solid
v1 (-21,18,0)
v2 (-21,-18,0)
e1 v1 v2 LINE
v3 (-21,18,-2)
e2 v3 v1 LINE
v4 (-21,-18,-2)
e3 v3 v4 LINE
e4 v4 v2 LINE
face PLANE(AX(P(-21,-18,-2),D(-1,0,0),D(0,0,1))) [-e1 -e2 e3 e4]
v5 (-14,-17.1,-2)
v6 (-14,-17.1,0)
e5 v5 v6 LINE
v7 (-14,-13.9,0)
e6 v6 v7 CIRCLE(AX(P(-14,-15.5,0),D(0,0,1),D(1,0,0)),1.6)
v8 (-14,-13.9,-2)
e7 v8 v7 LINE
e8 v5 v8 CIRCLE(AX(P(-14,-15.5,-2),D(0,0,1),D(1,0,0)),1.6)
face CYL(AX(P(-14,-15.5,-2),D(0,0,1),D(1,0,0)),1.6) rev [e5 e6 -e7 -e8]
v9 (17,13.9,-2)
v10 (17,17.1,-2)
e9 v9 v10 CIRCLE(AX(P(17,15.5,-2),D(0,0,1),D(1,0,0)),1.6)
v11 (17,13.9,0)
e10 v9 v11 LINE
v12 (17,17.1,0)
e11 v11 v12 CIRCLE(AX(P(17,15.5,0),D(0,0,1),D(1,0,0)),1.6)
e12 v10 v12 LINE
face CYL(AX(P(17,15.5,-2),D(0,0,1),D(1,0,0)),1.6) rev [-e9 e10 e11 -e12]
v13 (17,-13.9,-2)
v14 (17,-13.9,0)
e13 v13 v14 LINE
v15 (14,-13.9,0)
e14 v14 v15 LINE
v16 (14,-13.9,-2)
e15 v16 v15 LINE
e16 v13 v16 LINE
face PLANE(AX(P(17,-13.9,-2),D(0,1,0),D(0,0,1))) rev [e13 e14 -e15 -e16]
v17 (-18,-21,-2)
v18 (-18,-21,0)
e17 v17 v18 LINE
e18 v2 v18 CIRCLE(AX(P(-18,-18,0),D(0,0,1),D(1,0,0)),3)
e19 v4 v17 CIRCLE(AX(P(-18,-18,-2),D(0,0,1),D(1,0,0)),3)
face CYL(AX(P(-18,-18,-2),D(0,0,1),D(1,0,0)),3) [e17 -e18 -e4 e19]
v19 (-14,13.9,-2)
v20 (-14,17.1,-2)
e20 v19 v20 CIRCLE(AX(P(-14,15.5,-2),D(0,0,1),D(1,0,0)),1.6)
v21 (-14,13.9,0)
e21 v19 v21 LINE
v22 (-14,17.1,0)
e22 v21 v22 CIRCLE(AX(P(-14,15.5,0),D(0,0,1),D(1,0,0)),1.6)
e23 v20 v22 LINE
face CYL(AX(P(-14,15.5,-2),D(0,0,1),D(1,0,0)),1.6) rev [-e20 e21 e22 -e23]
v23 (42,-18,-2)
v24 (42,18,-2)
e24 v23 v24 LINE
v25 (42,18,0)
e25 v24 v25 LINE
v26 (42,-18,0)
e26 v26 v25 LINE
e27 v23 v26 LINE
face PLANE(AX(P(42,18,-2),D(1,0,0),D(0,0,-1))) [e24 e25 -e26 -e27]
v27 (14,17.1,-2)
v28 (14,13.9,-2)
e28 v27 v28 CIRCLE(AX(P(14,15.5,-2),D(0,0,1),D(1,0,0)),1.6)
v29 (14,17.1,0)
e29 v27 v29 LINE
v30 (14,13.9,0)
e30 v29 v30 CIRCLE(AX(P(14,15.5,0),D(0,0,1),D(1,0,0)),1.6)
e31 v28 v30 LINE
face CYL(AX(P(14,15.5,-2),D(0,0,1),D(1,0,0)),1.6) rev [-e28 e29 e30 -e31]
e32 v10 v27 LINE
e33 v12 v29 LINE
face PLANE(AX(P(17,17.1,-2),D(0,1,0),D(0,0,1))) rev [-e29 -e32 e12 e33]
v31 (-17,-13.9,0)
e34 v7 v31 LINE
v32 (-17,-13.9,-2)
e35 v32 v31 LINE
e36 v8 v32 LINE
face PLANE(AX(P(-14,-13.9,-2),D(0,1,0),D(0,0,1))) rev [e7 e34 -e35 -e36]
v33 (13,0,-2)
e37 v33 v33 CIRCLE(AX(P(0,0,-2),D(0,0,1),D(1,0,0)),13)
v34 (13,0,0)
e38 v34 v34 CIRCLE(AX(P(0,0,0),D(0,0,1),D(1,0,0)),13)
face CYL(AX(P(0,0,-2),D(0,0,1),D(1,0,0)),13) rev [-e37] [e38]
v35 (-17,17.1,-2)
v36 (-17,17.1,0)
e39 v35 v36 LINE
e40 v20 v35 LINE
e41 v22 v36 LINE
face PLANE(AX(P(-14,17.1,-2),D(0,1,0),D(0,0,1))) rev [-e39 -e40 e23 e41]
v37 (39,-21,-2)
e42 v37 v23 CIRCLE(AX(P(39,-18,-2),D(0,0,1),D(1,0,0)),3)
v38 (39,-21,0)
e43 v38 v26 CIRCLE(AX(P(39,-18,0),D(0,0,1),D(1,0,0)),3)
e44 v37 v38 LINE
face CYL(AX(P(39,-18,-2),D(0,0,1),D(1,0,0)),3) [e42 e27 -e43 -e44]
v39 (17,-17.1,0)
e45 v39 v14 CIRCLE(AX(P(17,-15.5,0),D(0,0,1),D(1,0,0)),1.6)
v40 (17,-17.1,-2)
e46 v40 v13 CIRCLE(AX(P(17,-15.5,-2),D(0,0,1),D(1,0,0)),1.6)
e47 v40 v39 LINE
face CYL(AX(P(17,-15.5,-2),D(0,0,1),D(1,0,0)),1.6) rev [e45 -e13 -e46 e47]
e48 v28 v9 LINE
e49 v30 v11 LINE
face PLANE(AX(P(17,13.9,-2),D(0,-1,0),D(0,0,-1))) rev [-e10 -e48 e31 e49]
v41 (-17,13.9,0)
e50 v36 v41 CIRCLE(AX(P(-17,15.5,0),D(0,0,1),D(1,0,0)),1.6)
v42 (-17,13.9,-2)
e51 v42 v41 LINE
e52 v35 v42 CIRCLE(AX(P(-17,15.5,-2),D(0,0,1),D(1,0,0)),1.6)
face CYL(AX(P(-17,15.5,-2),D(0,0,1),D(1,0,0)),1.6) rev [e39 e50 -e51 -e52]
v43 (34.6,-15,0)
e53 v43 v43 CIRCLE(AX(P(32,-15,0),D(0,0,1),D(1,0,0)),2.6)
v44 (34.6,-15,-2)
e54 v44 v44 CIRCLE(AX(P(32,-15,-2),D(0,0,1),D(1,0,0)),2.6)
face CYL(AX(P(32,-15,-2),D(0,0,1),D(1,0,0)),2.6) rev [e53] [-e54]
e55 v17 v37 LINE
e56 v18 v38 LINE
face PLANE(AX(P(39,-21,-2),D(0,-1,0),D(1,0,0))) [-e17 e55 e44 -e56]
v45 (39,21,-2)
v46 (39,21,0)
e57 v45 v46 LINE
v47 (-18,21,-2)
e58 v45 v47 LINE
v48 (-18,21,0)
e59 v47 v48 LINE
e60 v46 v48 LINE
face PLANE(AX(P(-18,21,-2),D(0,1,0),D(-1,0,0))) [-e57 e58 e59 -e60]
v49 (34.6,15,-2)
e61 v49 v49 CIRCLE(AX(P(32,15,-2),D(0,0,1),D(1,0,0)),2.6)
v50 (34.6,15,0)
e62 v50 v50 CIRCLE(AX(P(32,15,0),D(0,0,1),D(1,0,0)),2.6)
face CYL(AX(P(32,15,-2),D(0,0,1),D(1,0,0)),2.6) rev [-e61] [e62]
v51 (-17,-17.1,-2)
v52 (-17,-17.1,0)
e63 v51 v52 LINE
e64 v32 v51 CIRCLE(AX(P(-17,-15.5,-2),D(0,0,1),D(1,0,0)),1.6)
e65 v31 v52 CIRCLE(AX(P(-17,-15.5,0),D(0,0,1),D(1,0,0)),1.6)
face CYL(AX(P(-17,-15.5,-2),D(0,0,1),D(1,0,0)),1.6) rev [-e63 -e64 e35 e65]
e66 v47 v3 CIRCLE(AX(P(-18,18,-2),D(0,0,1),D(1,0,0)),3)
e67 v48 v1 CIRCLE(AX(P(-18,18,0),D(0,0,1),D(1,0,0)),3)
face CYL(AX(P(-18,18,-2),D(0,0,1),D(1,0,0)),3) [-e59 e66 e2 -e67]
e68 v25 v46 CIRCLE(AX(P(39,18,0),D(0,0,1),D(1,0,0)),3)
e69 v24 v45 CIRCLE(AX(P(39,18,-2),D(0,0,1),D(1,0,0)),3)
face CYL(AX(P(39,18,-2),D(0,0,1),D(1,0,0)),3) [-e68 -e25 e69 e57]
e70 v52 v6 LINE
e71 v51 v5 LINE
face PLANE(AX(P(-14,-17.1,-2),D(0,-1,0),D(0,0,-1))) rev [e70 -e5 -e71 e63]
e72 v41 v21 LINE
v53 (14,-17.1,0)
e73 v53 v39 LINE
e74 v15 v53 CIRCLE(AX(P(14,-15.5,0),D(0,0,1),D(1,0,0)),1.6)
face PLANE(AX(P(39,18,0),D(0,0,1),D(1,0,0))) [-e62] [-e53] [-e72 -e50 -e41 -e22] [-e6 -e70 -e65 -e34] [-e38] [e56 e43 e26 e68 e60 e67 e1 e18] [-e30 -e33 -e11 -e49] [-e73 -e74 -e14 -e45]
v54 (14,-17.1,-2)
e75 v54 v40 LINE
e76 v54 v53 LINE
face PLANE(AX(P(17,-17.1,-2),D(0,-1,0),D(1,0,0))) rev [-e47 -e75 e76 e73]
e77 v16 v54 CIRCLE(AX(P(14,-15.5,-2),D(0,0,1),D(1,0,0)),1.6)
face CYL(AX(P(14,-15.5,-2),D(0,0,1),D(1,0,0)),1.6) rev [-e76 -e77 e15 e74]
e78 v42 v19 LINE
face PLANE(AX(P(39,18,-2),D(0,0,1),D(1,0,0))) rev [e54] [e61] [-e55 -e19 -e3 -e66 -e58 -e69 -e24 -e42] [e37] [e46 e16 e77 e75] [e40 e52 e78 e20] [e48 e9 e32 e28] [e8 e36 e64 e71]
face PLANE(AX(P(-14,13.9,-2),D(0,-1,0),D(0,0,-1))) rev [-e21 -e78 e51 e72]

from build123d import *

# Parameters (mm, degrees)
SKETCH_1_R             = 13
SKETCH_1_R_2           = 2.6
SM_BASE_FLANGE_1_DEPTH = 2


# Sheet-metal steps are written as plain solids
with BuildPart() as part:
    # Sketch 1 → 基体-法兰1 (new body)
    with BuildSketch(Plane.XY):
        with BuildLine():
            Line((42, 18), (42, -18))
            ThreePointArc((42, -18), (41.121320344, -20.121320344), (39, -21))
            Line((39, -21), (-18, -21))
            ThreePointArc((-18, -21), (-20.121320344, -20.121320344), (-21, -18))
            Line((-21, -18), (-21, 18))
            ThreePointArc((-21, 18), (-20.121320344, 20.121320344), (-18, 21))
            Line((-18, 21), (39, 21))
            ThreePointArc((39, 21), (41.121320344, 20.121320344), (42, 18))
        make_face()
        Circle(SKETCH_1_R, mode=Mode.SUBTRACT)
        with Locations((32, 15)):
            Circle(SKETCH_1_R_2, mode=Mode.SUBTRACT)
        with Locations((32, -15)):
            Circle(SKETCH_1_R_2, mode=Mode.SUBTRACT)
        with BuildLine():
            Line((-14, 13.9), (-17, 13.9))
            ThreePointArc((-17, 13.9), (-18.6, 15.5), (-17, 17.1))
            Line((-17, 17.1), (-14, 17.1))
            ThreePointArc((-14, 17.1), (-12.4, 15.5), (-14, 13.9))
        make_face(mode=Mode.SUBTRACT)
        with BuildLine():
            Line((-14, -17.1), (-17, -17.1))
            ThreePointArc((-17, -17.1), (-18.6, -15.5), (-17, -13.9))
            Line((-17, -13.9), (-14, -13.9))
            ThreePointArc((-14, -13.9), (-12.4, -15.5), (-14, -17.1))
        make_face(mode=Mode.SUBTRACT)
        with BuildLine():
            Line((17, 13.9), (14, 13.9))
            ThreePointArc((14, 13.9), (12.4, 15.5), (14, 17.1))
            Line((14, 17.1), (17, 17.1))
            ThreePointArc((17, 17.1), (18.6, 15.5), (17, 13.9))
        make_face(mode=Mode.SUBTRACT)
        with BuildLine():
            Line((17, -17.1), (14, -17.1))
            ThreePointArc((14, -17.1), (12.4, -15.5), (14, -13.9))
            Line((14, -13.9), (17, -13.9))
            ThreePointArc((17, -13.9), (18.6, -15.5), (17, -17.1))
        make_face(mode=Mode.SUBTRACT)
    extrude(amount=-SM_BASE_FLANGE_1_DEPTH)


solid = part.part
